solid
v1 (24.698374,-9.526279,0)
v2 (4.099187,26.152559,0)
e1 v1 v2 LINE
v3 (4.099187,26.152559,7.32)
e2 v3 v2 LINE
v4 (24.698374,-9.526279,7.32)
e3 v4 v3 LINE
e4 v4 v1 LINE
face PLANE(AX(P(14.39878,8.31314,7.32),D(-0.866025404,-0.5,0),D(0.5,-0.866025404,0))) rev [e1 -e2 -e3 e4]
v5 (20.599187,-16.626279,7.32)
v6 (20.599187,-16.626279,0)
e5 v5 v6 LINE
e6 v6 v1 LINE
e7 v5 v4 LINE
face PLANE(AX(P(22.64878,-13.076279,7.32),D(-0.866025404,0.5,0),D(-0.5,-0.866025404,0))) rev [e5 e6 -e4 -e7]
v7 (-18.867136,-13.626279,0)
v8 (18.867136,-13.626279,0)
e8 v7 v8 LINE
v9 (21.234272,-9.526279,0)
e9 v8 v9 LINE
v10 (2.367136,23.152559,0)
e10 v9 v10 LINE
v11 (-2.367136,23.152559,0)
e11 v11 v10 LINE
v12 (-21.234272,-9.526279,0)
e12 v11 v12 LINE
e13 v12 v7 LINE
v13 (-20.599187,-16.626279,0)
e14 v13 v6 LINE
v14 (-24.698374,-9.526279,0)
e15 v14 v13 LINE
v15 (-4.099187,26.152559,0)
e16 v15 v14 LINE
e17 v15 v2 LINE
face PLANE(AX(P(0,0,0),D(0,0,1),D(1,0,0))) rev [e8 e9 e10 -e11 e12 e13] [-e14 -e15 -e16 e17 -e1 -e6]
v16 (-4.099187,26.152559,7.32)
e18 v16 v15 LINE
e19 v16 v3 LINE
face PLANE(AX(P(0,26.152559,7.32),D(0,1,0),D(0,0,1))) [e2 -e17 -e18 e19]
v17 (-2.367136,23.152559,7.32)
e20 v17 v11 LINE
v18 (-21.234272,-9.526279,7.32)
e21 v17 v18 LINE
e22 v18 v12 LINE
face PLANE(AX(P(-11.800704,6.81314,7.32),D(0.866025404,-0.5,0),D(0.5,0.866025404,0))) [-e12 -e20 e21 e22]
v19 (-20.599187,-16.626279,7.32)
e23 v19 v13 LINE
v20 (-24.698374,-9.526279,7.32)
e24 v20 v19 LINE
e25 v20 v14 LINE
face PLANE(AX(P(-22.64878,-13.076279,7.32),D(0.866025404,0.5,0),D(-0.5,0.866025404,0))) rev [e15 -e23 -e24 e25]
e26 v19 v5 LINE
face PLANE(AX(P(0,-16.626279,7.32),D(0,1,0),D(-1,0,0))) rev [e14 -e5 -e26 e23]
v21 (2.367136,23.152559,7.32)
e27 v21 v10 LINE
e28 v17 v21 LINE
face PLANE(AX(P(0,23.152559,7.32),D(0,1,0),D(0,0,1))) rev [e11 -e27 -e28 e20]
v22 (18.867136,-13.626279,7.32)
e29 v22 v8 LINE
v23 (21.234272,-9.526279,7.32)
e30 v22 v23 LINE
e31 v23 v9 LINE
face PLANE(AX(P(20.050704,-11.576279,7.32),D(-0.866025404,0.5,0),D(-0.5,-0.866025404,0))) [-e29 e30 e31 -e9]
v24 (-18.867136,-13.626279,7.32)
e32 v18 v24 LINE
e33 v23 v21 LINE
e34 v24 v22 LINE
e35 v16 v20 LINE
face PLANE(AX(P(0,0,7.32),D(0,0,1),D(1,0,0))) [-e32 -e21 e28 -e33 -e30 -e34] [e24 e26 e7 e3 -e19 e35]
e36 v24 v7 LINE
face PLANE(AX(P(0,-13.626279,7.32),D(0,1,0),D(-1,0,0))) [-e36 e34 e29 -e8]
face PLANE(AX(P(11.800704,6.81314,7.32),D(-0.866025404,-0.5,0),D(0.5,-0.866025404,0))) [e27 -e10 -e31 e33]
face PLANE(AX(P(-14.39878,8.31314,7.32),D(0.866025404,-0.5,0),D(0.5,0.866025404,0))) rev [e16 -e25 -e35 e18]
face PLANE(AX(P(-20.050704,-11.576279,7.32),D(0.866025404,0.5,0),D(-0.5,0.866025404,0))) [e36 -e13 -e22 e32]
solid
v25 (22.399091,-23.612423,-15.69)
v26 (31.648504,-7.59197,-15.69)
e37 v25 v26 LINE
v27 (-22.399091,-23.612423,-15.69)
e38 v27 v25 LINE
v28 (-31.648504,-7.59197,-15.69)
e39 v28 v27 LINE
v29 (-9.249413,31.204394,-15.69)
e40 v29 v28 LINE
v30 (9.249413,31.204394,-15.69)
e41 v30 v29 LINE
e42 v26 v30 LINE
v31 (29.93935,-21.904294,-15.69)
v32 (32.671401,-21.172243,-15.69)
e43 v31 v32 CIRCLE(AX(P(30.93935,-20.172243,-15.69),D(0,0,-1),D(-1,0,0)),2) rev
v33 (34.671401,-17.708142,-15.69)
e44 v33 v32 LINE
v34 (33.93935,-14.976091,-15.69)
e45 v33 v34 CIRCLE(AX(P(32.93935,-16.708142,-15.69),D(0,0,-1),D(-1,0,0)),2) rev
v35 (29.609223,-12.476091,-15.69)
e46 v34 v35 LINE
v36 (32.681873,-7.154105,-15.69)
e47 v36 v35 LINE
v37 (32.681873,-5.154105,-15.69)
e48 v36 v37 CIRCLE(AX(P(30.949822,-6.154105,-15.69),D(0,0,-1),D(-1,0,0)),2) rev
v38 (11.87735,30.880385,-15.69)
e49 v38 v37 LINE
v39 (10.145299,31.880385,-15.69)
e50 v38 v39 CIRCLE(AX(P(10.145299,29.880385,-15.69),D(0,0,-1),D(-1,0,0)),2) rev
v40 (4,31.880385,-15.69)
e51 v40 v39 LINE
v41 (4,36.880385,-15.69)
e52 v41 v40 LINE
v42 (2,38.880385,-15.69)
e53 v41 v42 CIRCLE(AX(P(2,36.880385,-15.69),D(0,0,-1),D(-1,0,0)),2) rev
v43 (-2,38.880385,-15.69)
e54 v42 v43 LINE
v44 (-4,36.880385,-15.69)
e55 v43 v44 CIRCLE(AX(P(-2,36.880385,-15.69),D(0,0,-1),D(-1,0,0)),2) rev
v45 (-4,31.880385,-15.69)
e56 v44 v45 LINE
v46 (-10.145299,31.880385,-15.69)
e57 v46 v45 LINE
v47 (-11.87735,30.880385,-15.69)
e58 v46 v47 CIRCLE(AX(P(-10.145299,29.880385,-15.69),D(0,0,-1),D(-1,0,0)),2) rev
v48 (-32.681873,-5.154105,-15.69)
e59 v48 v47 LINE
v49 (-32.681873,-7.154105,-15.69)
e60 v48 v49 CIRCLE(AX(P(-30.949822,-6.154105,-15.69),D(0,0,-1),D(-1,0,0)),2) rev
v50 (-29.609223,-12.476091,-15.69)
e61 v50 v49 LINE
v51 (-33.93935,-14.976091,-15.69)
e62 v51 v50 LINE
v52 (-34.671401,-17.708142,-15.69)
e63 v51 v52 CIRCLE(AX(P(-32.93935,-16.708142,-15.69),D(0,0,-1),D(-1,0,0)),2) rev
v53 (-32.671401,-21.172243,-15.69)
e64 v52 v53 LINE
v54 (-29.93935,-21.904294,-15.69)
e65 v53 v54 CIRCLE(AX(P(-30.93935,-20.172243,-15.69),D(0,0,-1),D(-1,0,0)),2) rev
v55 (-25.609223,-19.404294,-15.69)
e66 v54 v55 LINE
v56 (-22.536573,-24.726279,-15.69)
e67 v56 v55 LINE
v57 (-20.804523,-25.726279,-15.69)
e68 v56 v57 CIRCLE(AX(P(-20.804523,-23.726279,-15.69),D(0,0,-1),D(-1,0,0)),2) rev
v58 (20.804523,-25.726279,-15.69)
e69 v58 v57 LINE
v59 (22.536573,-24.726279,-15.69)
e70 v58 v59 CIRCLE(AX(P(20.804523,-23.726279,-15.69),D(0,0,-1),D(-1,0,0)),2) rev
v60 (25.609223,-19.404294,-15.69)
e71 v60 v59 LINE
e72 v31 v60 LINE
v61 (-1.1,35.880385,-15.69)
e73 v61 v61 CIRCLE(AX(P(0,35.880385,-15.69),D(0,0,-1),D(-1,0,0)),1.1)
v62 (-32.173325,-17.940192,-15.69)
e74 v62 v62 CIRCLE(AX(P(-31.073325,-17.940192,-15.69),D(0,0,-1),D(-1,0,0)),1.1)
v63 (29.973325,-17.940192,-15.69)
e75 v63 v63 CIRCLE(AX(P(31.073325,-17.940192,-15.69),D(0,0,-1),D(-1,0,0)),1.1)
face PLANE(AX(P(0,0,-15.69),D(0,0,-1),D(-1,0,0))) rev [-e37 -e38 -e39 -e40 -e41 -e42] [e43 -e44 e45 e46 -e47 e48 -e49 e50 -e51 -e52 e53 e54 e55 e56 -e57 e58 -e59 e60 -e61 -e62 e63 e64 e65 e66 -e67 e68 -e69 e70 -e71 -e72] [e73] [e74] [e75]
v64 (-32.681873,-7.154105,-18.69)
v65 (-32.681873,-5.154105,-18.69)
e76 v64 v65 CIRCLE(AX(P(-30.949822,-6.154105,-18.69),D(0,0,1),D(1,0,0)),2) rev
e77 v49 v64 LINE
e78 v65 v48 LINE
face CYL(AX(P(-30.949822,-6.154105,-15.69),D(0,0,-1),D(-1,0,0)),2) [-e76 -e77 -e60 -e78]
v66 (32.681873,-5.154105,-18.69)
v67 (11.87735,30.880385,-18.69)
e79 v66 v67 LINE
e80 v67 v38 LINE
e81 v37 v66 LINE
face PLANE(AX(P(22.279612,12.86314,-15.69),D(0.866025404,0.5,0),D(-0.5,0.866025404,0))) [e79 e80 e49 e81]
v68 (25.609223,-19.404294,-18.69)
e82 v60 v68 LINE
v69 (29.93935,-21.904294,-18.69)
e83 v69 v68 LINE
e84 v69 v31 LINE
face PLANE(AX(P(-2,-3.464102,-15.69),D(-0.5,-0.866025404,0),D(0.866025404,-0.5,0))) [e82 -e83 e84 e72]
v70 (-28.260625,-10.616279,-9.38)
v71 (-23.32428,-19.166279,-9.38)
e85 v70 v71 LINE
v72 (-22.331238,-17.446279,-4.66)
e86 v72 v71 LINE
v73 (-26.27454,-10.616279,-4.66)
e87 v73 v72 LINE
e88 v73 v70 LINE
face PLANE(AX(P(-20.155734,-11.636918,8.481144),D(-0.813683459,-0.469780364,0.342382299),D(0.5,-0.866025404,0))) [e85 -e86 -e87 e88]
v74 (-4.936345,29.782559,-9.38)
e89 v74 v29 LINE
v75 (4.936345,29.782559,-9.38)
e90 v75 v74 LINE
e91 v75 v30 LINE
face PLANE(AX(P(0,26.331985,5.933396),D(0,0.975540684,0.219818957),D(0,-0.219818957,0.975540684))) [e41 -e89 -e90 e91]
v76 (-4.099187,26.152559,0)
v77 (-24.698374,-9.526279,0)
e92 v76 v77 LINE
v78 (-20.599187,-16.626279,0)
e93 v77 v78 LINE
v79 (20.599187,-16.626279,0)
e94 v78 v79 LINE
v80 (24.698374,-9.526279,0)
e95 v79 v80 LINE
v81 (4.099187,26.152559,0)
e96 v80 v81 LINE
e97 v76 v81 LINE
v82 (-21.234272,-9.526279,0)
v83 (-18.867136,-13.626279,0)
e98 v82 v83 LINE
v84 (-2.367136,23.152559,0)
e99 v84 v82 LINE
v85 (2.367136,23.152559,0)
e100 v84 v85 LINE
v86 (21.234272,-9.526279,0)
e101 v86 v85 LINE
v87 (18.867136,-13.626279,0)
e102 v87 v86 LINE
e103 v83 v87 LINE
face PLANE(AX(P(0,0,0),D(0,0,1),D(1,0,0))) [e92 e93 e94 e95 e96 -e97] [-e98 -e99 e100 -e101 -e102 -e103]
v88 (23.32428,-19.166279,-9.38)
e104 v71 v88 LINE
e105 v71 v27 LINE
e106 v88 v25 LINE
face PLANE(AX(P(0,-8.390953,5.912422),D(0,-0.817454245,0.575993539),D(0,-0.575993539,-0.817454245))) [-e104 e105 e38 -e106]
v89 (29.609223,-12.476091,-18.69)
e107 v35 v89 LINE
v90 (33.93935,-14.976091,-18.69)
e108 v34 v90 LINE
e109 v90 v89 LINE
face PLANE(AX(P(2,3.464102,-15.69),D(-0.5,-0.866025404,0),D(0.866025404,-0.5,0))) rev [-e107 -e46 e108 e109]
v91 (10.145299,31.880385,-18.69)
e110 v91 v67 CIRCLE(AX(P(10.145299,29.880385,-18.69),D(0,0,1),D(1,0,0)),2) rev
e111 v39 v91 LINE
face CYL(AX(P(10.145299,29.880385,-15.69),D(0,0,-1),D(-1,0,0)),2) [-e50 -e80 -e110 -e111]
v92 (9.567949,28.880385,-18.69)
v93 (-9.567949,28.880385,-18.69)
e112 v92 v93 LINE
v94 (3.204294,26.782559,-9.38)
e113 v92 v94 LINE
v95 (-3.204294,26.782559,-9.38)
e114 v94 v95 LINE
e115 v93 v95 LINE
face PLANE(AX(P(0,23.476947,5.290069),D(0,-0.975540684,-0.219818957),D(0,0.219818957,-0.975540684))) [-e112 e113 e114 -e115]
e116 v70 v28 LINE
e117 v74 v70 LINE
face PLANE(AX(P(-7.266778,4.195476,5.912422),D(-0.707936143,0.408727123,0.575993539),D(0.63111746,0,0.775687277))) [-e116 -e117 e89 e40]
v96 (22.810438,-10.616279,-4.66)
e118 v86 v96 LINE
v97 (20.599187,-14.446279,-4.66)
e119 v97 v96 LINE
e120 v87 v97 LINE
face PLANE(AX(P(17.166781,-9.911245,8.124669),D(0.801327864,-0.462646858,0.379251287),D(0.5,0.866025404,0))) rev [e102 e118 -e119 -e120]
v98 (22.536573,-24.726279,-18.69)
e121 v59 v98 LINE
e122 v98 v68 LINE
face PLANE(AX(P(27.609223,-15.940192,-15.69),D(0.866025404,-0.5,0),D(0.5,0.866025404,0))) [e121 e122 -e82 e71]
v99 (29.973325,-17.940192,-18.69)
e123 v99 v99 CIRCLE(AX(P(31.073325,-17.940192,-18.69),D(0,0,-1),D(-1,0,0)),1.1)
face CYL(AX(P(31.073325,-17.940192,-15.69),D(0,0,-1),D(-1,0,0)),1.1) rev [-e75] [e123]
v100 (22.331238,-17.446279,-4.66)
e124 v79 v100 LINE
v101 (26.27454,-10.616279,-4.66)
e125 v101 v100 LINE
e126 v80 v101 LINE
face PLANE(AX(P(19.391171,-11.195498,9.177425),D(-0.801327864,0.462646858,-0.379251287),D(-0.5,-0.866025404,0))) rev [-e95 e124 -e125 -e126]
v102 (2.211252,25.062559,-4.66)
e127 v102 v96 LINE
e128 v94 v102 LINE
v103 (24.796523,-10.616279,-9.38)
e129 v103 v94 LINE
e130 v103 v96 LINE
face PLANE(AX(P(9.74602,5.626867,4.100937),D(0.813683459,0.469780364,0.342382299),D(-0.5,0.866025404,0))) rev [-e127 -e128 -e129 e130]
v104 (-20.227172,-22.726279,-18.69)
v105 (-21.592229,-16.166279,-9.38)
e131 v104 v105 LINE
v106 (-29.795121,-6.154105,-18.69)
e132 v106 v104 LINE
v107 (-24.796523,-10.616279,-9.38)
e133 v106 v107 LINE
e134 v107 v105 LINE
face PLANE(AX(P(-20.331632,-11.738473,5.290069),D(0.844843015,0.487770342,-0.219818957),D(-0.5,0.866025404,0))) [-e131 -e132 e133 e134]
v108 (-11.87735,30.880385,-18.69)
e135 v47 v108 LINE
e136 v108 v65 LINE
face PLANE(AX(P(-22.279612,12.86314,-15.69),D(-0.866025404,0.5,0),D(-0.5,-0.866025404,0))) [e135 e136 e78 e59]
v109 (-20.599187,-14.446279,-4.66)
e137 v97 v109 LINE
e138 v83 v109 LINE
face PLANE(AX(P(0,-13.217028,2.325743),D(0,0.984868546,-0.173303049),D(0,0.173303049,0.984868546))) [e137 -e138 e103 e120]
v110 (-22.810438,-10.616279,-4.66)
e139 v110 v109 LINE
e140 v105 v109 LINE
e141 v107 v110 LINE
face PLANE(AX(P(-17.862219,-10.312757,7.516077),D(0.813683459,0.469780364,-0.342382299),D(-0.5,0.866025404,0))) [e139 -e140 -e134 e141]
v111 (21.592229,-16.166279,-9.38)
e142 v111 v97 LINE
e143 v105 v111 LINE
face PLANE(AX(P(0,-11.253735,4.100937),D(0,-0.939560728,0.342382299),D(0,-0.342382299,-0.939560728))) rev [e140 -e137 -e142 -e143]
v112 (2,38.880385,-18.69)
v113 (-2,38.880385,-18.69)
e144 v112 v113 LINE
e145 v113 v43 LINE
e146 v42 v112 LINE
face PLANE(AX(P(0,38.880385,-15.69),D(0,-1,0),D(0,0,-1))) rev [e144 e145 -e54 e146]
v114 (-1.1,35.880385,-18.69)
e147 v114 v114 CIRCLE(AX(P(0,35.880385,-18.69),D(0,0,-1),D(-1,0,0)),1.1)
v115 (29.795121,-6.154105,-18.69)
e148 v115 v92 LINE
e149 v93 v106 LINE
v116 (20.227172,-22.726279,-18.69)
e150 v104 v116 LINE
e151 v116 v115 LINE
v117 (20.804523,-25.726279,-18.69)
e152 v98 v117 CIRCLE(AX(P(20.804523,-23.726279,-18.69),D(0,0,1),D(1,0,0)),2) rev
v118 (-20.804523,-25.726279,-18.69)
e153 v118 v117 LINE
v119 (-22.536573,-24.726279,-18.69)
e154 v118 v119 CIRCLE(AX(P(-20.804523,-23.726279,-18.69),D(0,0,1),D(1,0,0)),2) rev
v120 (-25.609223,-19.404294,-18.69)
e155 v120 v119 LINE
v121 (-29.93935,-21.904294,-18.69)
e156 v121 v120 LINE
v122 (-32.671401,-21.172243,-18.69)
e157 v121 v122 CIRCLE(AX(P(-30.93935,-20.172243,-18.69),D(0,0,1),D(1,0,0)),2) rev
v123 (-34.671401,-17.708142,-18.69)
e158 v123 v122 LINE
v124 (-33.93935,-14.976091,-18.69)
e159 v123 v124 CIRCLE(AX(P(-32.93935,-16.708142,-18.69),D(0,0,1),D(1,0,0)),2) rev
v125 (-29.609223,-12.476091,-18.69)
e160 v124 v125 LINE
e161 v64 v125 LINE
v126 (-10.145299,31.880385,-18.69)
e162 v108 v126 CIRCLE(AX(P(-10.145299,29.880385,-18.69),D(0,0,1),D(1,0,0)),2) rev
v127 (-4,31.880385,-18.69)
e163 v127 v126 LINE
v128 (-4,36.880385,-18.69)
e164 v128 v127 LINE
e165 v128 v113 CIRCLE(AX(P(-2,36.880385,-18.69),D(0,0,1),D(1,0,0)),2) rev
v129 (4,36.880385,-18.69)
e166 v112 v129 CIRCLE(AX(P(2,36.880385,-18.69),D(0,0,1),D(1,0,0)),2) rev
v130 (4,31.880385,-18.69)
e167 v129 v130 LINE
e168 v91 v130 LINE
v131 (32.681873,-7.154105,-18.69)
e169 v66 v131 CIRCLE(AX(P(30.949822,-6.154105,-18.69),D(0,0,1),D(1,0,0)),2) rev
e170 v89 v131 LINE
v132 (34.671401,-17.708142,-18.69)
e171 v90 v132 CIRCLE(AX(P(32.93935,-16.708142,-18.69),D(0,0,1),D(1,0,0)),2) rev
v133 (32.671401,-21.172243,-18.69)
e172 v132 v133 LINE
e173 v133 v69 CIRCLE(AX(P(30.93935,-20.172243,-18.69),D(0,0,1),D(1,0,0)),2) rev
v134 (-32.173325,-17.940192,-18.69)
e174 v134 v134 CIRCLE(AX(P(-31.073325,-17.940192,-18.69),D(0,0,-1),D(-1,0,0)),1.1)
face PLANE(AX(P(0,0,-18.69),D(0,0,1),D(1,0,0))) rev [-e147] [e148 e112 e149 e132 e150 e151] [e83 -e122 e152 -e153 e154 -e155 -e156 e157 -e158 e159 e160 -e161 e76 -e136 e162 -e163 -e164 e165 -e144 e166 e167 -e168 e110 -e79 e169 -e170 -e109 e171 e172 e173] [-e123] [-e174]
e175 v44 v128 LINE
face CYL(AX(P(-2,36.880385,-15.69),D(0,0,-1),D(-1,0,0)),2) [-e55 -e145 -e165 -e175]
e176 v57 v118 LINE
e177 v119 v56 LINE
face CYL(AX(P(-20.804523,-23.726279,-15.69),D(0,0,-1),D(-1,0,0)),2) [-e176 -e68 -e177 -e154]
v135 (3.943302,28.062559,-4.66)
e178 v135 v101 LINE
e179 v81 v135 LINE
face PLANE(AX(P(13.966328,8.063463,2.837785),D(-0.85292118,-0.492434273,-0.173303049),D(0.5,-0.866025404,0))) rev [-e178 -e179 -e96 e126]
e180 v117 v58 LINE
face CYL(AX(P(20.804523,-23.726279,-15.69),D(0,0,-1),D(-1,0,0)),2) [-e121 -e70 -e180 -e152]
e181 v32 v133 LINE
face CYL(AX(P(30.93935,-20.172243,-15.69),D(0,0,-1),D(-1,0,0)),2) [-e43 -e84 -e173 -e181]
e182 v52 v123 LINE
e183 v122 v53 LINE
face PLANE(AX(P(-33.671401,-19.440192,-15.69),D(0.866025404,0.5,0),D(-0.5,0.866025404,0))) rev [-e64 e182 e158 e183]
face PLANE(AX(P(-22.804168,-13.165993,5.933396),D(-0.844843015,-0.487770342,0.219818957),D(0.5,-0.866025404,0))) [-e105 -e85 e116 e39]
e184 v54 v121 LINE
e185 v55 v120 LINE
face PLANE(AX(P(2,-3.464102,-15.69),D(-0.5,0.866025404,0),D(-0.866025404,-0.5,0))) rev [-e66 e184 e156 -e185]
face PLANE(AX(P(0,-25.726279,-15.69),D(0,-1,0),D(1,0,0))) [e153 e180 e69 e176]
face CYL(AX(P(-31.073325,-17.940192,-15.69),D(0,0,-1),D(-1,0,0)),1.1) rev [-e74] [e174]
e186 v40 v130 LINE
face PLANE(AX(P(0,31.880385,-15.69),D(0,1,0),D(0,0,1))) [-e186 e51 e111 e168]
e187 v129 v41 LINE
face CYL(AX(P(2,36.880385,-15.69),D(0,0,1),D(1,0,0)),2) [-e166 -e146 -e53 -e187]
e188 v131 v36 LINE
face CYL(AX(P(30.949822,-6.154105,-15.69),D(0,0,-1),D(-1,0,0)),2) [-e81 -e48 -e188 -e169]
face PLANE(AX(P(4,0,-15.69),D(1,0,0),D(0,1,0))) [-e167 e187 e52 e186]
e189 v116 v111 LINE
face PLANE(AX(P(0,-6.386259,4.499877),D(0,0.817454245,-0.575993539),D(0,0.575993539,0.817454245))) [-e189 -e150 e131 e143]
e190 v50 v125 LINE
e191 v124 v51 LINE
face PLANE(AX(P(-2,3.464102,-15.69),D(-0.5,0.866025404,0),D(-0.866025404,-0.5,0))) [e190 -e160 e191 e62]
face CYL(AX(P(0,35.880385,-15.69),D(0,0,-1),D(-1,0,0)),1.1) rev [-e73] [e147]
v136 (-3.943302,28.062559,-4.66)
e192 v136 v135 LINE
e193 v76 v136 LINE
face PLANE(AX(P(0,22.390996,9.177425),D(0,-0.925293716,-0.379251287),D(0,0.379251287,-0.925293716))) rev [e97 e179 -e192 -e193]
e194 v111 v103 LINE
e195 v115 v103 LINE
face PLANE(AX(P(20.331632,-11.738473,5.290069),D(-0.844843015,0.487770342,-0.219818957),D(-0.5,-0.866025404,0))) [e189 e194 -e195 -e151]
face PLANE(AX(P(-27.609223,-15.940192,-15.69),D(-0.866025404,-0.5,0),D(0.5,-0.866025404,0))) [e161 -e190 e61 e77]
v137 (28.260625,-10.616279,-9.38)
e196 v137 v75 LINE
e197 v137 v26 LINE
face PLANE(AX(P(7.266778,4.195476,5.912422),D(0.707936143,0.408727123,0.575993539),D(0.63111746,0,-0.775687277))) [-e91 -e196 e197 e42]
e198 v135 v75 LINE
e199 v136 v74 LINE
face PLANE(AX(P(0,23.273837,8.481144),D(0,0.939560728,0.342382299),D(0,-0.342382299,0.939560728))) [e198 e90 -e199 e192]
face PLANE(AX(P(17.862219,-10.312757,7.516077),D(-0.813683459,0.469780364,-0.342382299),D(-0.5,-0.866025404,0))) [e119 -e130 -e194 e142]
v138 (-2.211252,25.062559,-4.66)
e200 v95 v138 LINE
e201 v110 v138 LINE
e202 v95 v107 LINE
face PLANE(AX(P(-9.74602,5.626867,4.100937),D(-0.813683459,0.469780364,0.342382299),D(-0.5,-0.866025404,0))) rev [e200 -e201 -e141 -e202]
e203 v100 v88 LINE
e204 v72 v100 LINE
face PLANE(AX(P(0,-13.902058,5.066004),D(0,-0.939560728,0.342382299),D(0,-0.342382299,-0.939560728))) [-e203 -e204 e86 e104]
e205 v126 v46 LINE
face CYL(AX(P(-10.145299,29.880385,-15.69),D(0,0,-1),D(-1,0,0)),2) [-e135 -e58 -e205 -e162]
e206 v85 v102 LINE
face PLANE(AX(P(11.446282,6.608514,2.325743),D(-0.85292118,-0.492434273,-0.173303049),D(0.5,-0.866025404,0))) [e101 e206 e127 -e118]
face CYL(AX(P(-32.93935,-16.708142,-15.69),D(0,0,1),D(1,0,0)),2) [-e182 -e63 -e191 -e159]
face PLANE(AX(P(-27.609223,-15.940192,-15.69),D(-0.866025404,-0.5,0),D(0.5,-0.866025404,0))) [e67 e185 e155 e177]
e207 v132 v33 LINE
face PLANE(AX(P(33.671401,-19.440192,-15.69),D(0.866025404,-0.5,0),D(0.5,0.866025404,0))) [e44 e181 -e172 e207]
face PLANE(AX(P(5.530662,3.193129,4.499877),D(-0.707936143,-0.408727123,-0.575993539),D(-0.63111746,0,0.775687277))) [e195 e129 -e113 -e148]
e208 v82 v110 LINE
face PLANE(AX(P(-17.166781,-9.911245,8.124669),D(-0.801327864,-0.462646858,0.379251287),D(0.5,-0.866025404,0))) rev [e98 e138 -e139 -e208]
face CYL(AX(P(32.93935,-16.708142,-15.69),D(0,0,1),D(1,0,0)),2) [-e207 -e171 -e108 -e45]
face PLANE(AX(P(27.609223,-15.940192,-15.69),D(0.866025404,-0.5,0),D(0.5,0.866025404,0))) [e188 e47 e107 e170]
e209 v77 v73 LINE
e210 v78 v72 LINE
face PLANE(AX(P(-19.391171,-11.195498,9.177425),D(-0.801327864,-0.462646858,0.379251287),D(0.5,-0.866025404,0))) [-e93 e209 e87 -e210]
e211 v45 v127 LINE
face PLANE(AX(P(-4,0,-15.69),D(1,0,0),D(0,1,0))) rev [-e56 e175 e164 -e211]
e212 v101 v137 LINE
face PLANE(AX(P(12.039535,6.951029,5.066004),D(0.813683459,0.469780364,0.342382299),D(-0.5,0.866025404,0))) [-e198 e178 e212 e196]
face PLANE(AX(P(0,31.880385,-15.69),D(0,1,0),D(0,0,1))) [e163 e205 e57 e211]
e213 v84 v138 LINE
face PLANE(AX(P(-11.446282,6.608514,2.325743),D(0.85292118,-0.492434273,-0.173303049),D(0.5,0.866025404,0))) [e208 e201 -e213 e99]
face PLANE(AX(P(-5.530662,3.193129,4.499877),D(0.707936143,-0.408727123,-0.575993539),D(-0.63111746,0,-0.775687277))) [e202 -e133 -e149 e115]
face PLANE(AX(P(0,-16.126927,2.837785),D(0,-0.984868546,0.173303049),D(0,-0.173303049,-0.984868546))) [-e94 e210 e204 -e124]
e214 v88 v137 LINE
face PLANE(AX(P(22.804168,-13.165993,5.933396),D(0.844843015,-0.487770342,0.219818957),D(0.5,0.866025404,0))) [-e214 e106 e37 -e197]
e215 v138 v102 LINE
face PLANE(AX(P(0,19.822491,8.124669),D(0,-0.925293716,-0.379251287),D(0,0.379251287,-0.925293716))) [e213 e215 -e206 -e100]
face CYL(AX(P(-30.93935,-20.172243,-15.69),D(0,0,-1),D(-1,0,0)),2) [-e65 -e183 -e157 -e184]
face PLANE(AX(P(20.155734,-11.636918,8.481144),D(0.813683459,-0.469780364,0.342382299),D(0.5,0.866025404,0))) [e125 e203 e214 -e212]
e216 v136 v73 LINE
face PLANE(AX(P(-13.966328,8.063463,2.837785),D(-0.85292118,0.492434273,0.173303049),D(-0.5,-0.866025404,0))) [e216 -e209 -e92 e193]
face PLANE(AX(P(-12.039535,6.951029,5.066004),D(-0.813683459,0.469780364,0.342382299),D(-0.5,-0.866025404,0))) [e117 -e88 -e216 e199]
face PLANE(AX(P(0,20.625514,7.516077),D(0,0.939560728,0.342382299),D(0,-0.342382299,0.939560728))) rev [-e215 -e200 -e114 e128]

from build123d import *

# Parameters (mm, degrees)
BOSS_EXTRUDE1_DEPTH     = 7.32
BOSS_EXTRUDE6_START     = -3
BOSS_EXTRUDE6_OUTLINE_R = 1.1
BOSS_EXTRUDE6_DEPTH     = 3
FILLET2_R               = 2


# Read off the part's stored shape, not the designer's step: Boss-Extrude6
with BuildPart() as part:
    # Sketch1 → Boss-Extrude1 (new body)
    with BuildSketch(Plane.XY):
        Polygon((-20.599186911, -16.626279442), (20.599186911, -16.626279442), (24.698373822, -9.526279442), (4.099186911, 26.152558883), (-4.099186911, 26.152558883), (-24.698373822, -9.526279442), align=None)
        Polygon((18.867136104, -13.626279442), (21.234272207, -9.526279442), (2.367136104, 23.152558883), (-2.367136104, 23.152558883), (-21.234272207, -9.526279442), (-18.867136104, -13.626279442), align=None, mode=Mode.SUBTRACT)
    extrude(amount=BOSS_EXTRUDE1_DEPTH)


with BuildPart() as body_2:
    # Sketch1<14> → Loft3 section 0
    with BuildSketch(Plane.XY):
        with BuildLine():
            Line((-4.099186911, 26.152558883), (-24.698373822, -9.526279442))
            Line((-24.698373822, -9.526279442), (-20.599186911, -16.626279442))
            Line((-20.599186911, -16.626279442), (20.599186911, -16.626279442))
            Line((20.599186911, -16.626279442), (24.698373822, -9.526279442))
            Line((24.698373822, -9.526279442), (4.099186911, 26.152558883))
            Line((4.099186911, 26.152558883), (-4.099186911, 26.152558883))
        make_face()
    # Sketch5 → Loft3 section 1
    with BuildSketch(Plane.XY.offset(-4.66)):
        with BuildLine():
            Line((-3.943302339, 28.062558883), (-26.274540057, -10.616279442))
            Line((-26.274540057, -10.616279442), (-22.331237719, -17.446279442))
            Line((-22.331237719, -17.446279442), (22.331237719, -17.446279442))
            Line((22.331237719, -17.446279442), (26.274540057, -10.616279442))
            Line((26.274540057, -10.616279442), (3.943302339, 28.062558883))
            Line((3.943302339, 28.062558883), (-3.943302339, 28.062558883))
        make_face()
    loft()

    # Sketch5<46> → Loft4 section 0
    with BuildSketch(Plane.XY.offset(-4.66)):
        with BuildLine():
            Line((-3.943302339, 28.062558883), (-26.274540057, -10.616279442))
            Line((-26.274540057, -10.616279442), (-22.331237719, -17.446279442))
            Line((-22.331237719, -17.446279442), (22.331237719, -17.446279442))
            Line((22.331237719, -17.446279442), (26.274540057, -10.616279442))
            Line((26.274540057, -10.616279442), (3.943302339, 28.062558883))
            Line((3.943302339, 28.062558883), (-3.943302339, 28.062558883))
        make_face()
    # Sketch13 → Loft4 section 1
    with BuildSketch(Plane.XY.offset(-9.38)):
        with BuildLine():
            Line((-4.936344802, 29.782558883), (-28.260624983, -10.616279442))
            Line((-28.260624983, -10.616279442), (-23.324280182, -19.166279442))
            Line((-23.324280182, -19.166279442), (23.324280182, -19.166279442))
            Line((23.324280182, -19.166279442), (28.260624983, -10.616279442))
            Line((28.260624983, -10.616279442), (4.936344802, 29.782558883))
            Line((4.936344802, 29.782558883), (-4.936344802, 29.782558883))
        make_face()
    loft()

    # Sketch13<4> → Loft5 section 0
    with BuildSketch(Plane.XY.offset(-9.38)):
        with BuildLine():
            Line((-4.936344802, 29.782558883), (-28.260624983, -10.616279442))
            Line((-28.260624983, -10.616279442), (-23.324280182, -19.166279442))
            Line((-23.324280182, -19.166279442), (23.324280182, -19.166279442))
            Line((23.324280182, -19.166279442), (28.260624983, -10.616279442))
            Line((28.260624983, -10.616279442), (4.936344802, 29.782558883))
            Line((4.936344802, 29.782558883), (-4.936344802, 29.782558883))
        make_face()
    # Sketch14 → Loft5 section 1
    with BuildSketch(Plane.XY.offset(-18.69)):
        with BuildLine():
            Line((11.3, 31.880384758), (-11.3, 31.880384758))
            Line((-11.3, 31.880384758), (-33.259223083, -6.154105316))
            Line((-33.259223083, -6.154105316), (-21.959223083, -25.726279442))
            Line((-21.959223083, -25.726279442), (21.959223083, -25.726279442))
            Line((21.959223083, -25.726279442), (33.259223083, -6.154105316))
            Line((33.259223083, -6.154105316), (11.3, 31.880384758))
        make_face()
    loft()

    # Sketch1<15> → Cut-Loft1 section 0
    with BuildSketch(Plane.XY):
        with BuildLine():
            Line((-2.367136104, 23.152558883), (2.367136104, 23.152558883))
            Line((2.367136104, 23.152558883), (21.234272207, -9.526279442))
            Line((21.234272207, -9.526279442), (18.867136104, -13.626279442))
            Line((18.867136104, -13.626279442), (-18.867136104, -13.626279442))
            Line((-18.867136104, -13.626279442), (-21.234272207, -9.526279442))
            Line((-21.234272207, -9.526279442), (-2.367136104, 23.152558883))
        make_face()
    # Sketch5<47> → Cut-Loft1 section 1
    with BuildSketch(Plane.XY.offset(-4.66)):
        with BuildLine():
            Line((2.211251531, 25.062558883), (22.810438442, -10.616279442))
            Line((22.810438442, -10.616279442), (20.599186911, -14.446279442))
            Line((20.599186911, -14.446279442), (-20.599186911, -14.446279442))
            Line((-20.599186911, -14.446279442), (-22.810438442, -10.616279442))
            Line((-22.810438442, -10.616279442), (-2.211251531, 25.062558883))
            Line((-2.211251531, 25.062558883), (2.211251531, 25.062558883))
        make_face()
    loft(mode=Mode.SUBTRACT)

    # Sketch14<5> → Cut-Loft2 section 0
    with BuildSketch(Plane.XY.offset(-18.69)):
        with BuildLine():
            Line((29.795121467, -6.154105316), (9.567949192, 28.880384758))
            Line((9.567949192, 28.880384758), (-9.567949192, 28.880384758))
            Line((-9.567949192, 28.880384758), (-29.795121467, -6.154105316))
            Line((-29.795121467, -6.154105316), (-20.227172275, -22.726279442))
            Line((-20.227172275, -22.726279442), (20.227172275, -22.726279442))
            Line((20.227172275, -22.726279442), (29.795121467, -6.154105316))
        make_face()
    # Sketch13<5> → Cut-Loft2 section 1
    with BuildSketch(Plane.XY.offset(-9.38)):
        with BuildLine():
            Line((-24.796523368, -10.616279442), (-21.592229374, -16.166279442))
            Line((-21.592229374, -16.166279442), (21.592229374, -16.166279442))
            Line((21.592229374, -16.166279442), (24.796523368, -10.616279442))
            Line((24.796523368, -10.616279442), (3.204293994, 26.782558883))
            Line((3.204293994, 26.782558883), (-3.204293994, 26.782558883))
            Line((-3.204293994, 26.782558883), (-24.796523368, -10.616279442))
        make_face()
    loft(mode=Mode.SUBTRACT)

    # Sketch13<6> → Cut-Loft3 section 0
    with BuildSketch(Plane.XY.offset(-9.38)):
        with BuildLine():
            Line((-24.796523368, -10.616279442), (-21.592229374, -16.166279442))
            Line((-21.592229374, -16.166279442), (21.592229374, -16.166279442))
            Line((21.592229374, -16.166279442), (24.796523368, -10.616279442))
            Line((24.796523368, -10.616279442), (3.204293994, 26.782558883))
            Line((3.204293994, 26.782558883), (-3.204293994, 26.782558883))
            Line((-3.204293994, 26.782558883), (-24.796523368, -10.616279442))
        make_face()
    # Sketch5<48> → Cut-Loft3 section 1
    with BuildSketch(Plane.XY.offset(-4.66)):
        with BuildLine():
            Line((2.211251531, 25.062558883), (22.810438442, -10.616279442))
            Line((22.810438442, -10.616279442), (20.599186911, -14.446279442))
            Line((20.599186911, -14.446279442), (-20.599186911, -14.446279442))
            Line((-20.599186911, -14.446279442), (-22.810438442, -10.616279442))
            Line((-22.810438442, -10.616279442), (-2.211251531, 25.062558883))
            Line((-2.211251531, 25.062558883), (2.211251531, 25.062558883))
        make_face()
    loft(mode=Mode.SUBTRACT)

    # Boss-Extrude6 outline → Boss-Extrude6 (add)
    with BuildSketch(Plane(origin=(0, 0, -18.69), x_dir=(-1, 0, 0), z_dir=(0, 0, -1)).offset(BOSS_EXTRUDE6_START)):
        Polygon((33.259223083, -6.154105316), (11.3, 31.880384758), (4, 31.880384758), (4, 38.880384758), (-4, 38.880384758), (-4, 31.880384758), (-11.3, 31.880384758), (-33.259223083, -6.154105316), (-29.609223083, -12.476090764), (-35.671400909, -15.976090764), (-31.671400909, -22.904293994), (-25.609223083, -19.404293994), (-21.959223083, -25.726279442), (21.959223083, -25.726279442), (25.609223083, -19.404293994), (31.671400909, -22.904293994), (35.671400909, -15.976090764), (29.609223083, -12.476090764), align=None)
        Polygon((-20.227172275, -22.726279442), (-29.795121467, -6.154105316), (-9.567949192, 28.880384758), (9.567949192, 28.880384758), (29.795121467, -6.154105316), (20.227172275, -22.726279442), align=None, mode=Mode.SUBTRACT)
        with Locations((31.073324698, -17.940192379)):
            Circle(BOSS_EXTRUDE6_OUTLINE_R, mode=Mode.SUBTRACT)
        with Locations((-31.073324698, -17.940192379)):
            Circle(BOSS_EXTRUDE6_OUTLINE_R, mode=Mode.SUBTRACT)
        with Locations((0, 35.880384758)):
            Circle(BOSS_EXTRUDE6_OUTLINE_R, mode=Mode.SUBTRACT)
    extrude(amount=BOSS_EXTRUDE6_DEPTH)

    # Fillet2
    fillet2_edges = [body_2.edges().sort_by_distance(p)[0] for p in [
        (-11.3, 31.880384758, -17.19),
        (-33.259223083, -6.154105316, -17.19),
        (-35.671400909, -15.976090764, -17.19),
        (-31.671400909, -22.904293994, -17.19),
        (-21.959223083, -25.726279442, -17.19),
        (21.959223083, -25.726279442, -17.19),
        (31.671400909, -22.904293994, -17.19),
        (35.671400909, -15.976090764, -17.19),
        (33.259223083, -6.154105316, -17.19),
        (11.3, 31.880384758, -17.19),
        (4, 38.880384758, -17.19),
        (-4, 38.880384758, -17.19),
    ]]
    fillet(fillet2_edges, radius=FILLET2_R)


solid = Compound([part.part, body_2.part])
